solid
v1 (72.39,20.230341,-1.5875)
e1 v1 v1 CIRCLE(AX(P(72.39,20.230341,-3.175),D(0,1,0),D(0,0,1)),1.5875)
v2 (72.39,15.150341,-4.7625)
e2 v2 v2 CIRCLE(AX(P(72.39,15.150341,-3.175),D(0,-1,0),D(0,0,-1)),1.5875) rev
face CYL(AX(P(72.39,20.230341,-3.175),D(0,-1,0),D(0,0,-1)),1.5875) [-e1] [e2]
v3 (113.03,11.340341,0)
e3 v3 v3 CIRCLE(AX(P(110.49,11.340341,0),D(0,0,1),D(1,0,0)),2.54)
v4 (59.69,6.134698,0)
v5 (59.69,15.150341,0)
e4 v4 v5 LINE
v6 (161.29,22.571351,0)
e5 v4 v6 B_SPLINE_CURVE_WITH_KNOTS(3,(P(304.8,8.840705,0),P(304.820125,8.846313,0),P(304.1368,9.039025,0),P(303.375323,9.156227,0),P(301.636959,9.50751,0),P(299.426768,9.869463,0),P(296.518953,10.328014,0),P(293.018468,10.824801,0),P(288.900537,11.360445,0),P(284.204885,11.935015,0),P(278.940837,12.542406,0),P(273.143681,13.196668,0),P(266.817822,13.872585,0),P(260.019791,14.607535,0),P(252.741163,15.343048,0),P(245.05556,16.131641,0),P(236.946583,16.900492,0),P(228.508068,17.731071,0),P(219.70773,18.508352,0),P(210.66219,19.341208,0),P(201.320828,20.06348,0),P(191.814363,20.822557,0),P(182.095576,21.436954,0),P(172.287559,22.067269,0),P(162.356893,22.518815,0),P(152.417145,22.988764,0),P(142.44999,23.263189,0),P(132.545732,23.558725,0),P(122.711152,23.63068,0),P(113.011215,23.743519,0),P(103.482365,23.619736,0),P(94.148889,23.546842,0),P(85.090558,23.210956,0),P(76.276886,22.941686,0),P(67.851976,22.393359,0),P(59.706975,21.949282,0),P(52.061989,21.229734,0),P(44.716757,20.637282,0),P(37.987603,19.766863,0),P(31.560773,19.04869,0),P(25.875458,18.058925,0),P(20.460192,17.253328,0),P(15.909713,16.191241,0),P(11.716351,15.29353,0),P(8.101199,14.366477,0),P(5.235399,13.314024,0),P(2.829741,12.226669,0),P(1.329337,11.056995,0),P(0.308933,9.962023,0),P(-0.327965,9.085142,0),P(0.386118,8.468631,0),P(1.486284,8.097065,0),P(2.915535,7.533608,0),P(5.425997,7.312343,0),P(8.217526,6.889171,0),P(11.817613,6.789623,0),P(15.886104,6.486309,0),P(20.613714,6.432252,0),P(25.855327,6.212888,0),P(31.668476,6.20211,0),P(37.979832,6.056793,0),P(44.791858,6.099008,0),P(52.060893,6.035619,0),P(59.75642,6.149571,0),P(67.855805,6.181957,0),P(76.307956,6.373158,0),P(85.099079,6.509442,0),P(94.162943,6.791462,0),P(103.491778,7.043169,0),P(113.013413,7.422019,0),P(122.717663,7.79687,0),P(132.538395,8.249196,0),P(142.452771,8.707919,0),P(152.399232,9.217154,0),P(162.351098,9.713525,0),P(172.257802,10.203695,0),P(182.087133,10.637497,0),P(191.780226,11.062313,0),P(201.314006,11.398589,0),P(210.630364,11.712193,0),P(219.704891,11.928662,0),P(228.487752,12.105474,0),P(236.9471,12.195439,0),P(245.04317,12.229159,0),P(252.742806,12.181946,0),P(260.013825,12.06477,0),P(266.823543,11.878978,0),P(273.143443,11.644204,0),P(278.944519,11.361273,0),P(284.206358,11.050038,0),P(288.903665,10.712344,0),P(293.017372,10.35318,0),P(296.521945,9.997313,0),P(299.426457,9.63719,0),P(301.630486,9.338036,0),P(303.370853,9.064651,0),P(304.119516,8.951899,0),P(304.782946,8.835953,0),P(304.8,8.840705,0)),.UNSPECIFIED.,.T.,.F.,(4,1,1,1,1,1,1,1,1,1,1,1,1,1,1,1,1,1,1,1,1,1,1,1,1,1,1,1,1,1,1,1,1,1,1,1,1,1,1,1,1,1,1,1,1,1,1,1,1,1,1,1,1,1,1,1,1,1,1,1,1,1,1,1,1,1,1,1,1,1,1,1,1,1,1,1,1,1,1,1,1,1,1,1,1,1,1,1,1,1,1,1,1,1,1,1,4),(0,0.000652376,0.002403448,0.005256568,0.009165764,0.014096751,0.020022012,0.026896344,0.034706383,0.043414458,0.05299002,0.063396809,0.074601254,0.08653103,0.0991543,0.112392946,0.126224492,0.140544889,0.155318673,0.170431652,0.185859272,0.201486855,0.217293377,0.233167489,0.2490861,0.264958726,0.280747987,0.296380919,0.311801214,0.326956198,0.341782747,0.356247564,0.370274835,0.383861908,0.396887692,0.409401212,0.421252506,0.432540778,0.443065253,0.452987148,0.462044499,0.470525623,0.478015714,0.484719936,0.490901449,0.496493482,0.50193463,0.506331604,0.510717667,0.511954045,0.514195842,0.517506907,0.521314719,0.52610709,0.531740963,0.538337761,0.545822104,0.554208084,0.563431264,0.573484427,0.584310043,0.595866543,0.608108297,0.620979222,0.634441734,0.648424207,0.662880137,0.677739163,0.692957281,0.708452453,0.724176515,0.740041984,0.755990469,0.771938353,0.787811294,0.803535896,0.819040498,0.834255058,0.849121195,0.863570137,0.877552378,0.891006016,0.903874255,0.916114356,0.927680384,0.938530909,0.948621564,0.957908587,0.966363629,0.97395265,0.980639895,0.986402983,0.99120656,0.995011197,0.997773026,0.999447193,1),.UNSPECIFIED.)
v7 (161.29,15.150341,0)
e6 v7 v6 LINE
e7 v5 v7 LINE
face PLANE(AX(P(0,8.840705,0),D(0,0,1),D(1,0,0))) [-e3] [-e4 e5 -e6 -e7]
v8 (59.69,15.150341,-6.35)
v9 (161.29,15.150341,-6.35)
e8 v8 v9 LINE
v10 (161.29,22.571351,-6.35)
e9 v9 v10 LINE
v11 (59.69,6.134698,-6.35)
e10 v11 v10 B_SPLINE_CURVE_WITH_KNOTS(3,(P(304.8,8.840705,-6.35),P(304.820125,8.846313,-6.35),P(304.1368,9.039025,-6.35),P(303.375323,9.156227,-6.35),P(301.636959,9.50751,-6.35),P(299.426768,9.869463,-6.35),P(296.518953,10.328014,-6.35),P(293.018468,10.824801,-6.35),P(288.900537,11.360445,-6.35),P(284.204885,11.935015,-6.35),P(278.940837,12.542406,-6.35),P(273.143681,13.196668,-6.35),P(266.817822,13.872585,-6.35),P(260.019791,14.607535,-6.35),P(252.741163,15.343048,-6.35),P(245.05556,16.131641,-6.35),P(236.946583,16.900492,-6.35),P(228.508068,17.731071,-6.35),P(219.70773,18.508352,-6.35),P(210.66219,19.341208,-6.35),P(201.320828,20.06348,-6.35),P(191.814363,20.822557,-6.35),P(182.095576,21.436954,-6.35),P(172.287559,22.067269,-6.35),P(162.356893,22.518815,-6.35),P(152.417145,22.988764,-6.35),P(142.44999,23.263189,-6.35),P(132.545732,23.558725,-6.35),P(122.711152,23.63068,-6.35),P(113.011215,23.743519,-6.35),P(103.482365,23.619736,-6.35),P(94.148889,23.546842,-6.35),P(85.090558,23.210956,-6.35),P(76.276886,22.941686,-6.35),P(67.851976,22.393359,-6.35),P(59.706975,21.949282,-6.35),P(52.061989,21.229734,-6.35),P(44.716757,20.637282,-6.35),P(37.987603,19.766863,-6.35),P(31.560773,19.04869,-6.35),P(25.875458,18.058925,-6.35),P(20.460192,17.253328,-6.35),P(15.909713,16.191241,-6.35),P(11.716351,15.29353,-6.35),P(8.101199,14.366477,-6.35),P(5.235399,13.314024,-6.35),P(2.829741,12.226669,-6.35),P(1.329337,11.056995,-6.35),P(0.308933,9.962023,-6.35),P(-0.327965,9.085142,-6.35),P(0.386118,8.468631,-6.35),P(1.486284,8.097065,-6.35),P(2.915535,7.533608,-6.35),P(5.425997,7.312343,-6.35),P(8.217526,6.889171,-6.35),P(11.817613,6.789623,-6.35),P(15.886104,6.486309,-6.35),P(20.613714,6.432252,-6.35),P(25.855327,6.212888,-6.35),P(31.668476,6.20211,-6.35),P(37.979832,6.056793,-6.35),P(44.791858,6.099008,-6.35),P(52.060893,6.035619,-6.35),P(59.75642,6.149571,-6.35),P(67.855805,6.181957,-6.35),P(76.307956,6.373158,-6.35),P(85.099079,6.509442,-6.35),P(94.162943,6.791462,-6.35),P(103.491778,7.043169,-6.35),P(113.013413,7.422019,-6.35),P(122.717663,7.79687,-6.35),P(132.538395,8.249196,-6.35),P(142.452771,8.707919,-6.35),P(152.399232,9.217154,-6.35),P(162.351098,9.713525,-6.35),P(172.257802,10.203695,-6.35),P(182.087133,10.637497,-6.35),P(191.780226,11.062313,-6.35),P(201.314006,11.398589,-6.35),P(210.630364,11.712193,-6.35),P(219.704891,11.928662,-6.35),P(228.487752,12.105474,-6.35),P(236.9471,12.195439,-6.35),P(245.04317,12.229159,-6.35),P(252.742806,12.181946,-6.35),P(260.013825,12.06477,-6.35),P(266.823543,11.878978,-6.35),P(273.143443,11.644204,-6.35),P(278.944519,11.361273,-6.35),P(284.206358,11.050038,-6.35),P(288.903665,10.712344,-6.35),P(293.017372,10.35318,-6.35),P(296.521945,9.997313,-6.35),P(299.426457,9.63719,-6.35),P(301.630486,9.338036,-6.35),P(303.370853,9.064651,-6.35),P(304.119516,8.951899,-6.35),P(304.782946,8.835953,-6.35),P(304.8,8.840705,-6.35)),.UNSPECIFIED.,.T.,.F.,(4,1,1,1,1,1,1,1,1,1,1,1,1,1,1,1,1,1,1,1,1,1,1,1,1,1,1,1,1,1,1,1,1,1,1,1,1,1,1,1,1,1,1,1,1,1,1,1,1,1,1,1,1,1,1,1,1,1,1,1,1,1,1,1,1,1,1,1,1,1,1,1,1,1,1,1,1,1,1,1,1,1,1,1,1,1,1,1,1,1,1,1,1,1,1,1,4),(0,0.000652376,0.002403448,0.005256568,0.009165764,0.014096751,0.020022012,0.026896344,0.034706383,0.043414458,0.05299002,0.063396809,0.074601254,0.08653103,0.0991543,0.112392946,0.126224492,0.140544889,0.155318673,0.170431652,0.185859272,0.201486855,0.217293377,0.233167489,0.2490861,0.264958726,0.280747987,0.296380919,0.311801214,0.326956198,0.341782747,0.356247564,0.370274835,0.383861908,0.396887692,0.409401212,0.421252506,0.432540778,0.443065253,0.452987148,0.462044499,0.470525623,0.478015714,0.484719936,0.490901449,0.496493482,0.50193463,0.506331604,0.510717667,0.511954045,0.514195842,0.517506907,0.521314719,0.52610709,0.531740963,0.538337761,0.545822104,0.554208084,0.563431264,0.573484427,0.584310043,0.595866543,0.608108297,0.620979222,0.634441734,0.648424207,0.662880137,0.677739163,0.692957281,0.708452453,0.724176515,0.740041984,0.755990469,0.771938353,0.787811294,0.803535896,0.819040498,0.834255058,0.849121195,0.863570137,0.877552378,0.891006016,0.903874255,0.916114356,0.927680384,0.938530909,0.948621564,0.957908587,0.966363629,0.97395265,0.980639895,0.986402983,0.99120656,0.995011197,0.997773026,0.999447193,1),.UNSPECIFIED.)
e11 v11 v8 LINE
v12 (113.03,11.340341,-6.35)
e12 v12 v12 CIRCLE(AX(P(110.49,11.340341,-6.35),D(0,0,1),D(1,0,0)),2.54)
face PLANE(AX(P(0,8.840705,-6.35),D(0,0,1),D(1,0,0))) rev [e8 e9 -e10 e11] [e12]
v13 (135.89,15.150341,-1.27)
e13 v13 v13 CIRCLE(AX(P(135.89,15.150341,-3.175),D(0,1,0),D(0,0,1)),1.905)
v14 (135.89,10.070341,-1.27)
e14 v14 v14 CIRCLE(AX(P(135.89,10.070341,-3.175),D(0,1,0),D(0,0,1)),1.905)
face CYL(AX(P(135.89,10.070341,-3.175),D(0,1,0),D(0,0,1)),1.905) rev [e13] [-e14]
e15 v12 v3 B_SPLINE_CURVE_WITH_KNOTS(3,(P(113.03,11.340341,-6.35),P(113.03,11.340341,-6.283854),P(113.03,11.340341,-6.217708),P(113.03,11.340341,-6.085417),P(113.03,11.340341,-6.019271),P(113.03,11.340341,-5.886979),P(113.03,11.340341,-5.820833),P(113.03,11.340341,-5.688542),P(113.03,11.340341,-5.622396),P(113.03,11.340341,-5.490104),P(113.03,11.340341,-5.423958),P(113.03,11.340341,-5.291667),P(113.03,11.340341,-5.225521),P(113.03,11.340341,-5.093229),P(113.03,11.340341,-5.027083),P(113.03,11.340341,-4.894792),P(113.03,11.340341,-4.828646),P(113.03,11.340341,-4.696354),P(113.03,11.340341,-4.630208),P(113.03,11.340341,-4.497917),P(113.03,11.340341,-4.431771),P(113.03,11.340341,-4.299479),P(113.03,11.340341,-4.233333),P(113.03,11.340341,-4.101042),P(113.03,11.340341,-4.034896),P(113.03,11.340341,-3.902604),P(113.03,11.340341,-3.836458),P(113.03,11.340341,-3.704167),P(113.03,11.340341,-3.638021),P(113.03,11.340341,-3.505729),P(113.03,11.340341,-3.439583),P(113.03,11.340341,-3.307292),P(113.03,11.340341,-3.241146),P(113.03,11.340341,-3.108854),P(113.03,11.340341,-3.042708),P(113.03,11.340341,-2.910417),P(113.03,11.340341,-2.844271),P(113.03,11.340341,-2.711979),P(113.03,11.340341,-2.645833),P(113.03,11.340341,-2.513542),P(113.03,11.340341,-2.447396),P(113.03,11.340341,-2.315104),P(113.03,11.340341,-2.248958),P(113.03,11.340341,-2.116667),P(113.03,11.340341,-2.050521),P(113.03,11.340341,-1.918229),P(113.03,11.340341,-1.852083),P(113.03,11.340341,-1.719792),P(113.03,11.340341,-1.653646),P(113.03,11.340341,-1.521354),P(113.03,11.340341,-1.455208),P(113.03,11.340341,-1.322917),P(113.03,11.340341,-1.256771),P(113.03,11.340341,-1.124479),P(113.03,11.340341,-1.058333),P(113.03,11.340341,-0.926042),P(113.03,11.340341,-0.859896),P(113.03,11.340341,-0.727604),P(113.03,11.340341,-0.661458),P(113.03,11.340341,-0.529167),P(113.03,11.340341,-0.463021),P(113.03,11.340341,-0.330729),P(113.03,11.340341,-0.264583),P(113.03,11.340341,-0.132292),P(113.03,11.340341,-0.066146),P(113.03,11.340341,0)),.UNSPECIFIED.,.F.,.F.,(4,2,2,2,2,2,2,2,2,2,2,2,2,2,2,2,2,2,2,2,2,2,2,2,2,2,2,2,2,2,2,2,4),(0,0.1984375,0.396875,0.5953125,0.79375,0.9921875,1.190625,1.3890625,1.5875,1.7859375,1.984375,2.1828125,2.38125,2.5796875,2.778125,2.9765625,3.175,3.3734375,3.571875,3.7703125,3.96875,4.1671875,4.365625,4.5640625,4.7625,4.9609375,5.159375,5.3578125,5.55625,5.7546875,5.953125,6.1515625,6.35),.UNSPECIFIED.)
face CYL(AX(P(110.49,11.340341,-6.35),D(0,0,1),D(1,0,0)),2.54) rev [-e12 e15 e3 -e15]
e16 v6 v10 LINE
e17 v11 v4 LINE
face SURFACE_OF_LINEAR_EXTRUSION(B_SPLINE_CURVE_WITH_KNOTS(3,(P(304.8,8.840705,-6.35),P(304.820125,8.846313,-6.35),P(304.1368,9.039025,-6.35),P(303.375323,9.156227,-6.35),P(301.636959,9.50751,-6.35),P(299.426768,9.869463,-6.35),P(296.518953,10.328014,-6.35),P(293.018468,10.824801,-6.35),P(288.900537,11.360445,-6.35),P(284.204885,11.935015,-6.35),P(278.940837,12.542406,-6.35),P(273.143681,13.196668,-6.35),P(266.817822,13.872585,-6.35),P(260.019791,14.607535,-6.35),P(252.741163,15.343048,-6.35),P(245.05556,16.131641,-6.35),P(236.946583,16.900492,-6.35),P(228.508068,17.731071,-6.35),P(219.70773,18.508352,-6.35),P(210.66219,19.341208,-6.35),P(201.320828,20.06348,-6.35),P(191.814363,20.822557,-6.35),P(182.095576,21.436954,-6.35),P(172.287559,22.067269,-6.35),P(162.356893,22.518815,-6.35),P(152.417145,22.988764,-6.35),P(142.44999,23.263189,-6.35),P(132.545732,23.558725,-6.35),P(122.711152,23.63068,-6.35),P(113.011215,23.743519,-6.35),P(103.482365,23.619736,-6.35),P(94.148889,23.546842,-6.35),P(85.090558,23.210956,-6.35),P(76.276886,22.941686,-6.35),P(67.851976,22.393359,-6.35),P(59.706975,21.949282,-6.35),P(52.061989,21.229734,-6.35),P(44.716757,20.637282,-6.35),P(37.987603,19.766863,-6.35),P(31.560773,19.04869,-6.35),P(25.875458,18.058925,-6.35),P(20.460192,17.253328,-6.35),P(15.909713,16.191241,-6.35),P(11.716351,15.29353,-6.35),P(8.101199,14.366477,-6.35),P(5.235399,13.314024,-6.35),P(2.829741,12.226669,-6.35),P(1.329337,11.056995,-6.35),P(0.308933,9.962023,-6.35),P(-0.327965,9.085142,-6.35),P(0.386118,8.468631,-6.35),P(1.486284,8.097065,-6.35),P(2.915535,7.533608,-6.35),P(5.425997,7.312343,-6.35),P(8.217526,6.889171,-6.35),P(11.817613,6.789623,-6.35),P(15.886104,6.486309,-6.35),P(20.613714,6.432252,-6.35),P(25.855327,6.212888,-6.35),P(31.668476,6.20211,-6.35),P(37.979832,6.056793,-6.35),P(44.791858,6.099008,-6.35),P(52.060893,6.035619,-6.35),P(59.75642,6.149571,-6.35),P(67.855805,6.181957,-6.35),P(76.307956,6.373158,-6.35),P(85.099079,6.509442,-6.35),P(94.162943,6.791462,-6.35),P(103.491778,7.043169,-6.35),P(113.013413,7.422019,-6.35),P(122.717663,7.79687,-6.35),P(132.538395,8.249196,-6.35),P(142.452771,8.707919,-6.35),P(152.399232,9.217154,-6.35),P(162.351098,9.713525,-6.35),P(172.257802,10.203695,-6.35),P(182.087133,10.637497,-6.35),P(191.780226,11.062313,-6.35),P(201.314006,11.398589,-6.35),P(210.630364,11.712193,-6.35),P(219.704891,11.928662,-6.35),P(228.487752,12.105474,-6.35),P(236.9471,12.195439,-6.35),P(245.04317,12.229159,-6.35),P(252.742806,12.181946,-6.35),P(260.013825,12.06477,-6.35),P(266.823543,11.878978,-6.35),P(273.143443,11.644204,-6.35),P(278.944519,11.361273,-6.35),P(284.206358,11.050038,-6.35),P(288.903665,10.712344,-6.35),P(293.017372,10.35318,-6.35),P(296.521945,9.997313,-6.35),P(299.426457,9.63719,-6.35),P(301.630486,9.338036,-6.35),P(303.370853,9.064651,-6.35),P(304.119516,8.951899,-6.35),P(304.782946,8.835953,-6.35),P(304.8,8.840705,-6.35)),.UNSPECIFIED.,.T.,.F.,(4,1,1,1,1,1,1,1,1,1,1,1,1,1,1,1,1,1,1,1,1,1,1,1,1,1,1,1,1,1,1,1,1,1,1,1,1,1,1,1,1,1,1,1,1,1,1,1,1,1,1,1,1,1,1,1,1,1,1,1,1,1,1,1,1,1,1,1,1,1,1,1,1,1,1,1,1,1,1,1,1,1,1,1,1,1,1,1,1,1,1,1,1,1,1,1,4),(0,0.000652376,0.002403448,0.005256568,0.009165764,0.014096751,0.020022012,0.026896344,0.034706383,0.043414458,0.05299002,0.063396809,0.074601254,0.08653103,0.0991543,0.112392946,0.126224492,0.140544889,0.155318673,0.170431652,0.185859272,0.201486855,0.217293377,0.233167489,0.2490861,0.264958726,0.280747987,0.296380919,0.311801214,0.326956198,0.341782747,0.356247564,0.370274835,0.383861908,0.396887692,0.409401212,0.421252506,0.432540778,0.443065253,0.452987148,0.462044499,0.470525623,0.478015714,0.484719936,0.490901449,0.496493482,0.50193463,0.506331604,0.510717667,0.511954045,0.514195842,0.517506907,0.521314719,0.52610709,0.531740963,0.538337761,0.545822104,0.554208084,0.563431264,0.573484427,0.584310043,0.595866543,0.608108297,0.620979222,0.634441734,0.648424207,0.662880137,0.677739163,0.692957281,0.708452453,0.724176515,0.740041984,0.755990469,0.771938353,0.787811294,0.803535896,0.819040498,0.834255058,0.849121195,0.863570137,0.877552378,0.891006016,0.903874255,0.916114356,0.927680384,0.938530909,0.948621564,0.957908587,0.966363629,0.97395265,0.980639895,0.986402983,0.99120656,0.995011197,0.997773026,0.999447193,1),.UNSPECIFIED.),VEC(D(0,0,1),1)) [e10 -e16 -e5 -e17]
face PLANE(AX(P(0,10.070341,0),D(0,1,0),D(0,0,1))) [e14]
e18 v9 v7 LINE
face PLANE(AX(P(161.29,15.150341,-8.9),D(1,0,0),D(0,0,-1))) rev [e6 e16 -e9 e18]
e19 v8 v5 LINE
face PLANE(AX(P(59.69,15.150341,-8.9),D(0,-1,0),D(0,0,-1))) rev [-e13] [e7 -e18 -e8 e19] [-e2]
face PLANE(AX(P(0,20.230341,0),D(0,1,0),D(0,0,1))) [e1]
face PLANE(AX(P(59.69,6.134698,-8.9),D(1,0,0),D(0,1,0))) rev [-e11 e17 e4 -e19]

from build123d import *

# Parameters (mm, degrees)
STOCK_BASE_START            = -6.35
STOCK_BASE_RIB_BODY_1_DEPTH = 6.35
BOSS_EXTRUDE1_DEPTH         = 5.08
CUT_EXTRUDE1_DEPTH          = 5.08
SKETCH2_R                   = 2.54
CUT_EXTRUDE2_DEPTH          = 306.702054727


# Read off the part's stored shape, not the designer's step: Stock-Base rib body-1
with BuildPart() as part:
    # Stock-Base rib body-1 outline → Stock-Base rib body-1 (new body)
    with BuildSketch(Plane.XY.offset(STOCK_BASE_START)):
        with BuildLine():
            Line((161.289999981, 22.571350716), (161.29, 15.150340758))
            Line((161.29, 15.150340758), (59.69, 15.150340758))
            Line((59.69, 15.150340758), (59.69, 6.134698498))
            add(Edge.make_bspline(
                [(59.69, 6.134698498), (62.370101804, 6.160023518), (67.877452262, 6.182447157), (76.307956217, 6.373158096), (85.09907939, 6.509442243), (94.162943379, 6.79146182), (103.491777789, 7.043168657), (113.013413145, 7.422019176), (122.717663004, 7.796869995), (132.538395015, 8.249196415), (142.452771402, 8.707918686), (152.399232196, 9.217154004), (162.351098417, 9.713525096), (172.257801894, 10.203694877), (182.087133464, 10.637497333), (191.780226111, 11.062313384), (201.314005616, 11.398588689), (210.630363502, 11.71219288), (219.704890932, 11.928662407), (228.487751662, 12.105474427), (236.947100219, 12.195438631), (245.043170333, 12.229158657), (252.742806253, 12.181946241), (260.013825454, 12.064770152), (266.8235427, 11.878977654), (273.14344318, 11.644203577), (278.944519004, 11.361273095), (284.206358459, 11.050038473), (288.903664519, 10.712343504), (293.017371724, 10.353180028), (296.521945453, 9.997313173), (299.426457428, 9.637189525), (301.630485972, 9.338036313), (303.370853204, 9.064651021), (304.119516082, 8.951899031), (304.782946498, 8.835953449), (304.8, 8.840705219), (304.82012511, 8.84631286), (304.136800475, 9.039024801), (303.375322868, 9.156226676), (301.636958583, 9.507509775), (299.426767543, 9.869463422), (296.518953252, 10.328013797), (293.018467792, 10.824800612), (288.900536795, 11.360444608), (284.204885436, 11.935014904), (278.940836996, 12.542405848), (273.143680748, 13.196668182), (266.817821912, 13.87258495), (260.019791182, 14.607535084), (252.741163128, 15.343048003), (245.055559941, 16.131641074), (236.946583275, 16.900491852), (228.508068346, 17.731071309), (219.707729735, 18.508351891), (210.662190304, 19.341207583), (201.320827802, 20.063479603), (191.814362749, 20.822556875), (182.095576055, 21.436953514), (172.287559077, 22.067269015), (165.318927668, 22.384131376), (161.648984481, 22.55467852), (161.289999981, 22.571350716)],
                knots=[0.608211552, 0.608211552, 0.608211552, 0.608211552, 0.620979222, 0.634441734, 0.648424207, 0.662880137, 0.677739163, 0.692957281, 0.708452453, 0.724176515, 0.740041984, 0.755990469, 0.771938353, 0.787811294, 0.803535896, 0.819040498, 0.834255058, 0.849121195, 0.863570137, 0.877552378, 0.891006016, 0.903874255, 0.916114356, 0.927680384, 0.938530909, 0.948621564, 0.957908587, 0.966363629, 0.97395265, 0.980639895, 0.986402983, 0.99120656, 0.995011197, 0.997773026, 0.999447193, 1, 1, 1, 1.000652376, 1.002403448, 1.005256568, 1.009165764, 1.014096751, 1.020022012, 1.026896344, 1.034706383, 1.043414458, 1.05299002, 1.063396809, 1.074601254, 1.08653103, 1.0991543, 1.112392946, 1.126224492, 1.140544889, 1.155318673, 1.170431652, 1.185859272, 1.201486855, 1.217293377, 1.233167489, 1.234888603, 1.234888603, 1.234888603, 1.234888603], degree=3))
        make_face()
    extrude(amount=STOCK_BASE_RIB_BODY_1_DEPTH)

    # Sketch1 → Boss-Extrude1 (add)
    with BuildSketch(Plane(origin=(0, 15.150340758, 0), x_dir=(1, 0, 0), z_dir=(0, 1, 0))):
        with BuildLine():
            ThreePointArc((70.8025, 3.175), (72.39, 1.5875), (73.9775, 3.175))
            Line((73.9775, 3.175), (70.8025, 3.175))
        make_face()
        with BuildLine():
            Line((70.8025, 3.175), (73.9775, 3.175))
            ThreePointArc((73.9775, 3.175), (72.39, 4.7625), (70.8025, 3.175))
        make_face()
    extrude(amount=BOSS_EXTRUDE1_DEPTH)

    # Sketch1<3> → Cut-Extrude1 (cut)
    with BuildSketch(Plane(origin=(0, 15.150340758, 0), x_dir=(1, 0, 0), z_dir=(0, 1, 0))):
        with BuildLine():
            ThreePointArc((133.985, 3.175), (135.89, 1.27), (137.795, 3.175))
            Line((137.795, 3.175), (133.985, 3.175))
        make_face()
        with BuildLine():
            Line((133.985, 3.175), (137.795, 3.175))
            ThreePointArc((137.795, 3.175), (135.89, 5.08), (133.985, 3.175))
        make_face()
    extrude(amount=-CUT_EXTRUDE1_DEPTH, mode=Mode.SUBTRACT)

    # Sketch2 → Cut-Extrude2 (cut, through all)
    with BuildSketch(Plane.XY):
        with Locations((110.49, 11.340340758)):
            Circle(SKETCH2_R)
    extrude(amount=-CUT_EXTRUDE2_DEPTH, mode=Mode.SUBTRACT)


solid = part.part
